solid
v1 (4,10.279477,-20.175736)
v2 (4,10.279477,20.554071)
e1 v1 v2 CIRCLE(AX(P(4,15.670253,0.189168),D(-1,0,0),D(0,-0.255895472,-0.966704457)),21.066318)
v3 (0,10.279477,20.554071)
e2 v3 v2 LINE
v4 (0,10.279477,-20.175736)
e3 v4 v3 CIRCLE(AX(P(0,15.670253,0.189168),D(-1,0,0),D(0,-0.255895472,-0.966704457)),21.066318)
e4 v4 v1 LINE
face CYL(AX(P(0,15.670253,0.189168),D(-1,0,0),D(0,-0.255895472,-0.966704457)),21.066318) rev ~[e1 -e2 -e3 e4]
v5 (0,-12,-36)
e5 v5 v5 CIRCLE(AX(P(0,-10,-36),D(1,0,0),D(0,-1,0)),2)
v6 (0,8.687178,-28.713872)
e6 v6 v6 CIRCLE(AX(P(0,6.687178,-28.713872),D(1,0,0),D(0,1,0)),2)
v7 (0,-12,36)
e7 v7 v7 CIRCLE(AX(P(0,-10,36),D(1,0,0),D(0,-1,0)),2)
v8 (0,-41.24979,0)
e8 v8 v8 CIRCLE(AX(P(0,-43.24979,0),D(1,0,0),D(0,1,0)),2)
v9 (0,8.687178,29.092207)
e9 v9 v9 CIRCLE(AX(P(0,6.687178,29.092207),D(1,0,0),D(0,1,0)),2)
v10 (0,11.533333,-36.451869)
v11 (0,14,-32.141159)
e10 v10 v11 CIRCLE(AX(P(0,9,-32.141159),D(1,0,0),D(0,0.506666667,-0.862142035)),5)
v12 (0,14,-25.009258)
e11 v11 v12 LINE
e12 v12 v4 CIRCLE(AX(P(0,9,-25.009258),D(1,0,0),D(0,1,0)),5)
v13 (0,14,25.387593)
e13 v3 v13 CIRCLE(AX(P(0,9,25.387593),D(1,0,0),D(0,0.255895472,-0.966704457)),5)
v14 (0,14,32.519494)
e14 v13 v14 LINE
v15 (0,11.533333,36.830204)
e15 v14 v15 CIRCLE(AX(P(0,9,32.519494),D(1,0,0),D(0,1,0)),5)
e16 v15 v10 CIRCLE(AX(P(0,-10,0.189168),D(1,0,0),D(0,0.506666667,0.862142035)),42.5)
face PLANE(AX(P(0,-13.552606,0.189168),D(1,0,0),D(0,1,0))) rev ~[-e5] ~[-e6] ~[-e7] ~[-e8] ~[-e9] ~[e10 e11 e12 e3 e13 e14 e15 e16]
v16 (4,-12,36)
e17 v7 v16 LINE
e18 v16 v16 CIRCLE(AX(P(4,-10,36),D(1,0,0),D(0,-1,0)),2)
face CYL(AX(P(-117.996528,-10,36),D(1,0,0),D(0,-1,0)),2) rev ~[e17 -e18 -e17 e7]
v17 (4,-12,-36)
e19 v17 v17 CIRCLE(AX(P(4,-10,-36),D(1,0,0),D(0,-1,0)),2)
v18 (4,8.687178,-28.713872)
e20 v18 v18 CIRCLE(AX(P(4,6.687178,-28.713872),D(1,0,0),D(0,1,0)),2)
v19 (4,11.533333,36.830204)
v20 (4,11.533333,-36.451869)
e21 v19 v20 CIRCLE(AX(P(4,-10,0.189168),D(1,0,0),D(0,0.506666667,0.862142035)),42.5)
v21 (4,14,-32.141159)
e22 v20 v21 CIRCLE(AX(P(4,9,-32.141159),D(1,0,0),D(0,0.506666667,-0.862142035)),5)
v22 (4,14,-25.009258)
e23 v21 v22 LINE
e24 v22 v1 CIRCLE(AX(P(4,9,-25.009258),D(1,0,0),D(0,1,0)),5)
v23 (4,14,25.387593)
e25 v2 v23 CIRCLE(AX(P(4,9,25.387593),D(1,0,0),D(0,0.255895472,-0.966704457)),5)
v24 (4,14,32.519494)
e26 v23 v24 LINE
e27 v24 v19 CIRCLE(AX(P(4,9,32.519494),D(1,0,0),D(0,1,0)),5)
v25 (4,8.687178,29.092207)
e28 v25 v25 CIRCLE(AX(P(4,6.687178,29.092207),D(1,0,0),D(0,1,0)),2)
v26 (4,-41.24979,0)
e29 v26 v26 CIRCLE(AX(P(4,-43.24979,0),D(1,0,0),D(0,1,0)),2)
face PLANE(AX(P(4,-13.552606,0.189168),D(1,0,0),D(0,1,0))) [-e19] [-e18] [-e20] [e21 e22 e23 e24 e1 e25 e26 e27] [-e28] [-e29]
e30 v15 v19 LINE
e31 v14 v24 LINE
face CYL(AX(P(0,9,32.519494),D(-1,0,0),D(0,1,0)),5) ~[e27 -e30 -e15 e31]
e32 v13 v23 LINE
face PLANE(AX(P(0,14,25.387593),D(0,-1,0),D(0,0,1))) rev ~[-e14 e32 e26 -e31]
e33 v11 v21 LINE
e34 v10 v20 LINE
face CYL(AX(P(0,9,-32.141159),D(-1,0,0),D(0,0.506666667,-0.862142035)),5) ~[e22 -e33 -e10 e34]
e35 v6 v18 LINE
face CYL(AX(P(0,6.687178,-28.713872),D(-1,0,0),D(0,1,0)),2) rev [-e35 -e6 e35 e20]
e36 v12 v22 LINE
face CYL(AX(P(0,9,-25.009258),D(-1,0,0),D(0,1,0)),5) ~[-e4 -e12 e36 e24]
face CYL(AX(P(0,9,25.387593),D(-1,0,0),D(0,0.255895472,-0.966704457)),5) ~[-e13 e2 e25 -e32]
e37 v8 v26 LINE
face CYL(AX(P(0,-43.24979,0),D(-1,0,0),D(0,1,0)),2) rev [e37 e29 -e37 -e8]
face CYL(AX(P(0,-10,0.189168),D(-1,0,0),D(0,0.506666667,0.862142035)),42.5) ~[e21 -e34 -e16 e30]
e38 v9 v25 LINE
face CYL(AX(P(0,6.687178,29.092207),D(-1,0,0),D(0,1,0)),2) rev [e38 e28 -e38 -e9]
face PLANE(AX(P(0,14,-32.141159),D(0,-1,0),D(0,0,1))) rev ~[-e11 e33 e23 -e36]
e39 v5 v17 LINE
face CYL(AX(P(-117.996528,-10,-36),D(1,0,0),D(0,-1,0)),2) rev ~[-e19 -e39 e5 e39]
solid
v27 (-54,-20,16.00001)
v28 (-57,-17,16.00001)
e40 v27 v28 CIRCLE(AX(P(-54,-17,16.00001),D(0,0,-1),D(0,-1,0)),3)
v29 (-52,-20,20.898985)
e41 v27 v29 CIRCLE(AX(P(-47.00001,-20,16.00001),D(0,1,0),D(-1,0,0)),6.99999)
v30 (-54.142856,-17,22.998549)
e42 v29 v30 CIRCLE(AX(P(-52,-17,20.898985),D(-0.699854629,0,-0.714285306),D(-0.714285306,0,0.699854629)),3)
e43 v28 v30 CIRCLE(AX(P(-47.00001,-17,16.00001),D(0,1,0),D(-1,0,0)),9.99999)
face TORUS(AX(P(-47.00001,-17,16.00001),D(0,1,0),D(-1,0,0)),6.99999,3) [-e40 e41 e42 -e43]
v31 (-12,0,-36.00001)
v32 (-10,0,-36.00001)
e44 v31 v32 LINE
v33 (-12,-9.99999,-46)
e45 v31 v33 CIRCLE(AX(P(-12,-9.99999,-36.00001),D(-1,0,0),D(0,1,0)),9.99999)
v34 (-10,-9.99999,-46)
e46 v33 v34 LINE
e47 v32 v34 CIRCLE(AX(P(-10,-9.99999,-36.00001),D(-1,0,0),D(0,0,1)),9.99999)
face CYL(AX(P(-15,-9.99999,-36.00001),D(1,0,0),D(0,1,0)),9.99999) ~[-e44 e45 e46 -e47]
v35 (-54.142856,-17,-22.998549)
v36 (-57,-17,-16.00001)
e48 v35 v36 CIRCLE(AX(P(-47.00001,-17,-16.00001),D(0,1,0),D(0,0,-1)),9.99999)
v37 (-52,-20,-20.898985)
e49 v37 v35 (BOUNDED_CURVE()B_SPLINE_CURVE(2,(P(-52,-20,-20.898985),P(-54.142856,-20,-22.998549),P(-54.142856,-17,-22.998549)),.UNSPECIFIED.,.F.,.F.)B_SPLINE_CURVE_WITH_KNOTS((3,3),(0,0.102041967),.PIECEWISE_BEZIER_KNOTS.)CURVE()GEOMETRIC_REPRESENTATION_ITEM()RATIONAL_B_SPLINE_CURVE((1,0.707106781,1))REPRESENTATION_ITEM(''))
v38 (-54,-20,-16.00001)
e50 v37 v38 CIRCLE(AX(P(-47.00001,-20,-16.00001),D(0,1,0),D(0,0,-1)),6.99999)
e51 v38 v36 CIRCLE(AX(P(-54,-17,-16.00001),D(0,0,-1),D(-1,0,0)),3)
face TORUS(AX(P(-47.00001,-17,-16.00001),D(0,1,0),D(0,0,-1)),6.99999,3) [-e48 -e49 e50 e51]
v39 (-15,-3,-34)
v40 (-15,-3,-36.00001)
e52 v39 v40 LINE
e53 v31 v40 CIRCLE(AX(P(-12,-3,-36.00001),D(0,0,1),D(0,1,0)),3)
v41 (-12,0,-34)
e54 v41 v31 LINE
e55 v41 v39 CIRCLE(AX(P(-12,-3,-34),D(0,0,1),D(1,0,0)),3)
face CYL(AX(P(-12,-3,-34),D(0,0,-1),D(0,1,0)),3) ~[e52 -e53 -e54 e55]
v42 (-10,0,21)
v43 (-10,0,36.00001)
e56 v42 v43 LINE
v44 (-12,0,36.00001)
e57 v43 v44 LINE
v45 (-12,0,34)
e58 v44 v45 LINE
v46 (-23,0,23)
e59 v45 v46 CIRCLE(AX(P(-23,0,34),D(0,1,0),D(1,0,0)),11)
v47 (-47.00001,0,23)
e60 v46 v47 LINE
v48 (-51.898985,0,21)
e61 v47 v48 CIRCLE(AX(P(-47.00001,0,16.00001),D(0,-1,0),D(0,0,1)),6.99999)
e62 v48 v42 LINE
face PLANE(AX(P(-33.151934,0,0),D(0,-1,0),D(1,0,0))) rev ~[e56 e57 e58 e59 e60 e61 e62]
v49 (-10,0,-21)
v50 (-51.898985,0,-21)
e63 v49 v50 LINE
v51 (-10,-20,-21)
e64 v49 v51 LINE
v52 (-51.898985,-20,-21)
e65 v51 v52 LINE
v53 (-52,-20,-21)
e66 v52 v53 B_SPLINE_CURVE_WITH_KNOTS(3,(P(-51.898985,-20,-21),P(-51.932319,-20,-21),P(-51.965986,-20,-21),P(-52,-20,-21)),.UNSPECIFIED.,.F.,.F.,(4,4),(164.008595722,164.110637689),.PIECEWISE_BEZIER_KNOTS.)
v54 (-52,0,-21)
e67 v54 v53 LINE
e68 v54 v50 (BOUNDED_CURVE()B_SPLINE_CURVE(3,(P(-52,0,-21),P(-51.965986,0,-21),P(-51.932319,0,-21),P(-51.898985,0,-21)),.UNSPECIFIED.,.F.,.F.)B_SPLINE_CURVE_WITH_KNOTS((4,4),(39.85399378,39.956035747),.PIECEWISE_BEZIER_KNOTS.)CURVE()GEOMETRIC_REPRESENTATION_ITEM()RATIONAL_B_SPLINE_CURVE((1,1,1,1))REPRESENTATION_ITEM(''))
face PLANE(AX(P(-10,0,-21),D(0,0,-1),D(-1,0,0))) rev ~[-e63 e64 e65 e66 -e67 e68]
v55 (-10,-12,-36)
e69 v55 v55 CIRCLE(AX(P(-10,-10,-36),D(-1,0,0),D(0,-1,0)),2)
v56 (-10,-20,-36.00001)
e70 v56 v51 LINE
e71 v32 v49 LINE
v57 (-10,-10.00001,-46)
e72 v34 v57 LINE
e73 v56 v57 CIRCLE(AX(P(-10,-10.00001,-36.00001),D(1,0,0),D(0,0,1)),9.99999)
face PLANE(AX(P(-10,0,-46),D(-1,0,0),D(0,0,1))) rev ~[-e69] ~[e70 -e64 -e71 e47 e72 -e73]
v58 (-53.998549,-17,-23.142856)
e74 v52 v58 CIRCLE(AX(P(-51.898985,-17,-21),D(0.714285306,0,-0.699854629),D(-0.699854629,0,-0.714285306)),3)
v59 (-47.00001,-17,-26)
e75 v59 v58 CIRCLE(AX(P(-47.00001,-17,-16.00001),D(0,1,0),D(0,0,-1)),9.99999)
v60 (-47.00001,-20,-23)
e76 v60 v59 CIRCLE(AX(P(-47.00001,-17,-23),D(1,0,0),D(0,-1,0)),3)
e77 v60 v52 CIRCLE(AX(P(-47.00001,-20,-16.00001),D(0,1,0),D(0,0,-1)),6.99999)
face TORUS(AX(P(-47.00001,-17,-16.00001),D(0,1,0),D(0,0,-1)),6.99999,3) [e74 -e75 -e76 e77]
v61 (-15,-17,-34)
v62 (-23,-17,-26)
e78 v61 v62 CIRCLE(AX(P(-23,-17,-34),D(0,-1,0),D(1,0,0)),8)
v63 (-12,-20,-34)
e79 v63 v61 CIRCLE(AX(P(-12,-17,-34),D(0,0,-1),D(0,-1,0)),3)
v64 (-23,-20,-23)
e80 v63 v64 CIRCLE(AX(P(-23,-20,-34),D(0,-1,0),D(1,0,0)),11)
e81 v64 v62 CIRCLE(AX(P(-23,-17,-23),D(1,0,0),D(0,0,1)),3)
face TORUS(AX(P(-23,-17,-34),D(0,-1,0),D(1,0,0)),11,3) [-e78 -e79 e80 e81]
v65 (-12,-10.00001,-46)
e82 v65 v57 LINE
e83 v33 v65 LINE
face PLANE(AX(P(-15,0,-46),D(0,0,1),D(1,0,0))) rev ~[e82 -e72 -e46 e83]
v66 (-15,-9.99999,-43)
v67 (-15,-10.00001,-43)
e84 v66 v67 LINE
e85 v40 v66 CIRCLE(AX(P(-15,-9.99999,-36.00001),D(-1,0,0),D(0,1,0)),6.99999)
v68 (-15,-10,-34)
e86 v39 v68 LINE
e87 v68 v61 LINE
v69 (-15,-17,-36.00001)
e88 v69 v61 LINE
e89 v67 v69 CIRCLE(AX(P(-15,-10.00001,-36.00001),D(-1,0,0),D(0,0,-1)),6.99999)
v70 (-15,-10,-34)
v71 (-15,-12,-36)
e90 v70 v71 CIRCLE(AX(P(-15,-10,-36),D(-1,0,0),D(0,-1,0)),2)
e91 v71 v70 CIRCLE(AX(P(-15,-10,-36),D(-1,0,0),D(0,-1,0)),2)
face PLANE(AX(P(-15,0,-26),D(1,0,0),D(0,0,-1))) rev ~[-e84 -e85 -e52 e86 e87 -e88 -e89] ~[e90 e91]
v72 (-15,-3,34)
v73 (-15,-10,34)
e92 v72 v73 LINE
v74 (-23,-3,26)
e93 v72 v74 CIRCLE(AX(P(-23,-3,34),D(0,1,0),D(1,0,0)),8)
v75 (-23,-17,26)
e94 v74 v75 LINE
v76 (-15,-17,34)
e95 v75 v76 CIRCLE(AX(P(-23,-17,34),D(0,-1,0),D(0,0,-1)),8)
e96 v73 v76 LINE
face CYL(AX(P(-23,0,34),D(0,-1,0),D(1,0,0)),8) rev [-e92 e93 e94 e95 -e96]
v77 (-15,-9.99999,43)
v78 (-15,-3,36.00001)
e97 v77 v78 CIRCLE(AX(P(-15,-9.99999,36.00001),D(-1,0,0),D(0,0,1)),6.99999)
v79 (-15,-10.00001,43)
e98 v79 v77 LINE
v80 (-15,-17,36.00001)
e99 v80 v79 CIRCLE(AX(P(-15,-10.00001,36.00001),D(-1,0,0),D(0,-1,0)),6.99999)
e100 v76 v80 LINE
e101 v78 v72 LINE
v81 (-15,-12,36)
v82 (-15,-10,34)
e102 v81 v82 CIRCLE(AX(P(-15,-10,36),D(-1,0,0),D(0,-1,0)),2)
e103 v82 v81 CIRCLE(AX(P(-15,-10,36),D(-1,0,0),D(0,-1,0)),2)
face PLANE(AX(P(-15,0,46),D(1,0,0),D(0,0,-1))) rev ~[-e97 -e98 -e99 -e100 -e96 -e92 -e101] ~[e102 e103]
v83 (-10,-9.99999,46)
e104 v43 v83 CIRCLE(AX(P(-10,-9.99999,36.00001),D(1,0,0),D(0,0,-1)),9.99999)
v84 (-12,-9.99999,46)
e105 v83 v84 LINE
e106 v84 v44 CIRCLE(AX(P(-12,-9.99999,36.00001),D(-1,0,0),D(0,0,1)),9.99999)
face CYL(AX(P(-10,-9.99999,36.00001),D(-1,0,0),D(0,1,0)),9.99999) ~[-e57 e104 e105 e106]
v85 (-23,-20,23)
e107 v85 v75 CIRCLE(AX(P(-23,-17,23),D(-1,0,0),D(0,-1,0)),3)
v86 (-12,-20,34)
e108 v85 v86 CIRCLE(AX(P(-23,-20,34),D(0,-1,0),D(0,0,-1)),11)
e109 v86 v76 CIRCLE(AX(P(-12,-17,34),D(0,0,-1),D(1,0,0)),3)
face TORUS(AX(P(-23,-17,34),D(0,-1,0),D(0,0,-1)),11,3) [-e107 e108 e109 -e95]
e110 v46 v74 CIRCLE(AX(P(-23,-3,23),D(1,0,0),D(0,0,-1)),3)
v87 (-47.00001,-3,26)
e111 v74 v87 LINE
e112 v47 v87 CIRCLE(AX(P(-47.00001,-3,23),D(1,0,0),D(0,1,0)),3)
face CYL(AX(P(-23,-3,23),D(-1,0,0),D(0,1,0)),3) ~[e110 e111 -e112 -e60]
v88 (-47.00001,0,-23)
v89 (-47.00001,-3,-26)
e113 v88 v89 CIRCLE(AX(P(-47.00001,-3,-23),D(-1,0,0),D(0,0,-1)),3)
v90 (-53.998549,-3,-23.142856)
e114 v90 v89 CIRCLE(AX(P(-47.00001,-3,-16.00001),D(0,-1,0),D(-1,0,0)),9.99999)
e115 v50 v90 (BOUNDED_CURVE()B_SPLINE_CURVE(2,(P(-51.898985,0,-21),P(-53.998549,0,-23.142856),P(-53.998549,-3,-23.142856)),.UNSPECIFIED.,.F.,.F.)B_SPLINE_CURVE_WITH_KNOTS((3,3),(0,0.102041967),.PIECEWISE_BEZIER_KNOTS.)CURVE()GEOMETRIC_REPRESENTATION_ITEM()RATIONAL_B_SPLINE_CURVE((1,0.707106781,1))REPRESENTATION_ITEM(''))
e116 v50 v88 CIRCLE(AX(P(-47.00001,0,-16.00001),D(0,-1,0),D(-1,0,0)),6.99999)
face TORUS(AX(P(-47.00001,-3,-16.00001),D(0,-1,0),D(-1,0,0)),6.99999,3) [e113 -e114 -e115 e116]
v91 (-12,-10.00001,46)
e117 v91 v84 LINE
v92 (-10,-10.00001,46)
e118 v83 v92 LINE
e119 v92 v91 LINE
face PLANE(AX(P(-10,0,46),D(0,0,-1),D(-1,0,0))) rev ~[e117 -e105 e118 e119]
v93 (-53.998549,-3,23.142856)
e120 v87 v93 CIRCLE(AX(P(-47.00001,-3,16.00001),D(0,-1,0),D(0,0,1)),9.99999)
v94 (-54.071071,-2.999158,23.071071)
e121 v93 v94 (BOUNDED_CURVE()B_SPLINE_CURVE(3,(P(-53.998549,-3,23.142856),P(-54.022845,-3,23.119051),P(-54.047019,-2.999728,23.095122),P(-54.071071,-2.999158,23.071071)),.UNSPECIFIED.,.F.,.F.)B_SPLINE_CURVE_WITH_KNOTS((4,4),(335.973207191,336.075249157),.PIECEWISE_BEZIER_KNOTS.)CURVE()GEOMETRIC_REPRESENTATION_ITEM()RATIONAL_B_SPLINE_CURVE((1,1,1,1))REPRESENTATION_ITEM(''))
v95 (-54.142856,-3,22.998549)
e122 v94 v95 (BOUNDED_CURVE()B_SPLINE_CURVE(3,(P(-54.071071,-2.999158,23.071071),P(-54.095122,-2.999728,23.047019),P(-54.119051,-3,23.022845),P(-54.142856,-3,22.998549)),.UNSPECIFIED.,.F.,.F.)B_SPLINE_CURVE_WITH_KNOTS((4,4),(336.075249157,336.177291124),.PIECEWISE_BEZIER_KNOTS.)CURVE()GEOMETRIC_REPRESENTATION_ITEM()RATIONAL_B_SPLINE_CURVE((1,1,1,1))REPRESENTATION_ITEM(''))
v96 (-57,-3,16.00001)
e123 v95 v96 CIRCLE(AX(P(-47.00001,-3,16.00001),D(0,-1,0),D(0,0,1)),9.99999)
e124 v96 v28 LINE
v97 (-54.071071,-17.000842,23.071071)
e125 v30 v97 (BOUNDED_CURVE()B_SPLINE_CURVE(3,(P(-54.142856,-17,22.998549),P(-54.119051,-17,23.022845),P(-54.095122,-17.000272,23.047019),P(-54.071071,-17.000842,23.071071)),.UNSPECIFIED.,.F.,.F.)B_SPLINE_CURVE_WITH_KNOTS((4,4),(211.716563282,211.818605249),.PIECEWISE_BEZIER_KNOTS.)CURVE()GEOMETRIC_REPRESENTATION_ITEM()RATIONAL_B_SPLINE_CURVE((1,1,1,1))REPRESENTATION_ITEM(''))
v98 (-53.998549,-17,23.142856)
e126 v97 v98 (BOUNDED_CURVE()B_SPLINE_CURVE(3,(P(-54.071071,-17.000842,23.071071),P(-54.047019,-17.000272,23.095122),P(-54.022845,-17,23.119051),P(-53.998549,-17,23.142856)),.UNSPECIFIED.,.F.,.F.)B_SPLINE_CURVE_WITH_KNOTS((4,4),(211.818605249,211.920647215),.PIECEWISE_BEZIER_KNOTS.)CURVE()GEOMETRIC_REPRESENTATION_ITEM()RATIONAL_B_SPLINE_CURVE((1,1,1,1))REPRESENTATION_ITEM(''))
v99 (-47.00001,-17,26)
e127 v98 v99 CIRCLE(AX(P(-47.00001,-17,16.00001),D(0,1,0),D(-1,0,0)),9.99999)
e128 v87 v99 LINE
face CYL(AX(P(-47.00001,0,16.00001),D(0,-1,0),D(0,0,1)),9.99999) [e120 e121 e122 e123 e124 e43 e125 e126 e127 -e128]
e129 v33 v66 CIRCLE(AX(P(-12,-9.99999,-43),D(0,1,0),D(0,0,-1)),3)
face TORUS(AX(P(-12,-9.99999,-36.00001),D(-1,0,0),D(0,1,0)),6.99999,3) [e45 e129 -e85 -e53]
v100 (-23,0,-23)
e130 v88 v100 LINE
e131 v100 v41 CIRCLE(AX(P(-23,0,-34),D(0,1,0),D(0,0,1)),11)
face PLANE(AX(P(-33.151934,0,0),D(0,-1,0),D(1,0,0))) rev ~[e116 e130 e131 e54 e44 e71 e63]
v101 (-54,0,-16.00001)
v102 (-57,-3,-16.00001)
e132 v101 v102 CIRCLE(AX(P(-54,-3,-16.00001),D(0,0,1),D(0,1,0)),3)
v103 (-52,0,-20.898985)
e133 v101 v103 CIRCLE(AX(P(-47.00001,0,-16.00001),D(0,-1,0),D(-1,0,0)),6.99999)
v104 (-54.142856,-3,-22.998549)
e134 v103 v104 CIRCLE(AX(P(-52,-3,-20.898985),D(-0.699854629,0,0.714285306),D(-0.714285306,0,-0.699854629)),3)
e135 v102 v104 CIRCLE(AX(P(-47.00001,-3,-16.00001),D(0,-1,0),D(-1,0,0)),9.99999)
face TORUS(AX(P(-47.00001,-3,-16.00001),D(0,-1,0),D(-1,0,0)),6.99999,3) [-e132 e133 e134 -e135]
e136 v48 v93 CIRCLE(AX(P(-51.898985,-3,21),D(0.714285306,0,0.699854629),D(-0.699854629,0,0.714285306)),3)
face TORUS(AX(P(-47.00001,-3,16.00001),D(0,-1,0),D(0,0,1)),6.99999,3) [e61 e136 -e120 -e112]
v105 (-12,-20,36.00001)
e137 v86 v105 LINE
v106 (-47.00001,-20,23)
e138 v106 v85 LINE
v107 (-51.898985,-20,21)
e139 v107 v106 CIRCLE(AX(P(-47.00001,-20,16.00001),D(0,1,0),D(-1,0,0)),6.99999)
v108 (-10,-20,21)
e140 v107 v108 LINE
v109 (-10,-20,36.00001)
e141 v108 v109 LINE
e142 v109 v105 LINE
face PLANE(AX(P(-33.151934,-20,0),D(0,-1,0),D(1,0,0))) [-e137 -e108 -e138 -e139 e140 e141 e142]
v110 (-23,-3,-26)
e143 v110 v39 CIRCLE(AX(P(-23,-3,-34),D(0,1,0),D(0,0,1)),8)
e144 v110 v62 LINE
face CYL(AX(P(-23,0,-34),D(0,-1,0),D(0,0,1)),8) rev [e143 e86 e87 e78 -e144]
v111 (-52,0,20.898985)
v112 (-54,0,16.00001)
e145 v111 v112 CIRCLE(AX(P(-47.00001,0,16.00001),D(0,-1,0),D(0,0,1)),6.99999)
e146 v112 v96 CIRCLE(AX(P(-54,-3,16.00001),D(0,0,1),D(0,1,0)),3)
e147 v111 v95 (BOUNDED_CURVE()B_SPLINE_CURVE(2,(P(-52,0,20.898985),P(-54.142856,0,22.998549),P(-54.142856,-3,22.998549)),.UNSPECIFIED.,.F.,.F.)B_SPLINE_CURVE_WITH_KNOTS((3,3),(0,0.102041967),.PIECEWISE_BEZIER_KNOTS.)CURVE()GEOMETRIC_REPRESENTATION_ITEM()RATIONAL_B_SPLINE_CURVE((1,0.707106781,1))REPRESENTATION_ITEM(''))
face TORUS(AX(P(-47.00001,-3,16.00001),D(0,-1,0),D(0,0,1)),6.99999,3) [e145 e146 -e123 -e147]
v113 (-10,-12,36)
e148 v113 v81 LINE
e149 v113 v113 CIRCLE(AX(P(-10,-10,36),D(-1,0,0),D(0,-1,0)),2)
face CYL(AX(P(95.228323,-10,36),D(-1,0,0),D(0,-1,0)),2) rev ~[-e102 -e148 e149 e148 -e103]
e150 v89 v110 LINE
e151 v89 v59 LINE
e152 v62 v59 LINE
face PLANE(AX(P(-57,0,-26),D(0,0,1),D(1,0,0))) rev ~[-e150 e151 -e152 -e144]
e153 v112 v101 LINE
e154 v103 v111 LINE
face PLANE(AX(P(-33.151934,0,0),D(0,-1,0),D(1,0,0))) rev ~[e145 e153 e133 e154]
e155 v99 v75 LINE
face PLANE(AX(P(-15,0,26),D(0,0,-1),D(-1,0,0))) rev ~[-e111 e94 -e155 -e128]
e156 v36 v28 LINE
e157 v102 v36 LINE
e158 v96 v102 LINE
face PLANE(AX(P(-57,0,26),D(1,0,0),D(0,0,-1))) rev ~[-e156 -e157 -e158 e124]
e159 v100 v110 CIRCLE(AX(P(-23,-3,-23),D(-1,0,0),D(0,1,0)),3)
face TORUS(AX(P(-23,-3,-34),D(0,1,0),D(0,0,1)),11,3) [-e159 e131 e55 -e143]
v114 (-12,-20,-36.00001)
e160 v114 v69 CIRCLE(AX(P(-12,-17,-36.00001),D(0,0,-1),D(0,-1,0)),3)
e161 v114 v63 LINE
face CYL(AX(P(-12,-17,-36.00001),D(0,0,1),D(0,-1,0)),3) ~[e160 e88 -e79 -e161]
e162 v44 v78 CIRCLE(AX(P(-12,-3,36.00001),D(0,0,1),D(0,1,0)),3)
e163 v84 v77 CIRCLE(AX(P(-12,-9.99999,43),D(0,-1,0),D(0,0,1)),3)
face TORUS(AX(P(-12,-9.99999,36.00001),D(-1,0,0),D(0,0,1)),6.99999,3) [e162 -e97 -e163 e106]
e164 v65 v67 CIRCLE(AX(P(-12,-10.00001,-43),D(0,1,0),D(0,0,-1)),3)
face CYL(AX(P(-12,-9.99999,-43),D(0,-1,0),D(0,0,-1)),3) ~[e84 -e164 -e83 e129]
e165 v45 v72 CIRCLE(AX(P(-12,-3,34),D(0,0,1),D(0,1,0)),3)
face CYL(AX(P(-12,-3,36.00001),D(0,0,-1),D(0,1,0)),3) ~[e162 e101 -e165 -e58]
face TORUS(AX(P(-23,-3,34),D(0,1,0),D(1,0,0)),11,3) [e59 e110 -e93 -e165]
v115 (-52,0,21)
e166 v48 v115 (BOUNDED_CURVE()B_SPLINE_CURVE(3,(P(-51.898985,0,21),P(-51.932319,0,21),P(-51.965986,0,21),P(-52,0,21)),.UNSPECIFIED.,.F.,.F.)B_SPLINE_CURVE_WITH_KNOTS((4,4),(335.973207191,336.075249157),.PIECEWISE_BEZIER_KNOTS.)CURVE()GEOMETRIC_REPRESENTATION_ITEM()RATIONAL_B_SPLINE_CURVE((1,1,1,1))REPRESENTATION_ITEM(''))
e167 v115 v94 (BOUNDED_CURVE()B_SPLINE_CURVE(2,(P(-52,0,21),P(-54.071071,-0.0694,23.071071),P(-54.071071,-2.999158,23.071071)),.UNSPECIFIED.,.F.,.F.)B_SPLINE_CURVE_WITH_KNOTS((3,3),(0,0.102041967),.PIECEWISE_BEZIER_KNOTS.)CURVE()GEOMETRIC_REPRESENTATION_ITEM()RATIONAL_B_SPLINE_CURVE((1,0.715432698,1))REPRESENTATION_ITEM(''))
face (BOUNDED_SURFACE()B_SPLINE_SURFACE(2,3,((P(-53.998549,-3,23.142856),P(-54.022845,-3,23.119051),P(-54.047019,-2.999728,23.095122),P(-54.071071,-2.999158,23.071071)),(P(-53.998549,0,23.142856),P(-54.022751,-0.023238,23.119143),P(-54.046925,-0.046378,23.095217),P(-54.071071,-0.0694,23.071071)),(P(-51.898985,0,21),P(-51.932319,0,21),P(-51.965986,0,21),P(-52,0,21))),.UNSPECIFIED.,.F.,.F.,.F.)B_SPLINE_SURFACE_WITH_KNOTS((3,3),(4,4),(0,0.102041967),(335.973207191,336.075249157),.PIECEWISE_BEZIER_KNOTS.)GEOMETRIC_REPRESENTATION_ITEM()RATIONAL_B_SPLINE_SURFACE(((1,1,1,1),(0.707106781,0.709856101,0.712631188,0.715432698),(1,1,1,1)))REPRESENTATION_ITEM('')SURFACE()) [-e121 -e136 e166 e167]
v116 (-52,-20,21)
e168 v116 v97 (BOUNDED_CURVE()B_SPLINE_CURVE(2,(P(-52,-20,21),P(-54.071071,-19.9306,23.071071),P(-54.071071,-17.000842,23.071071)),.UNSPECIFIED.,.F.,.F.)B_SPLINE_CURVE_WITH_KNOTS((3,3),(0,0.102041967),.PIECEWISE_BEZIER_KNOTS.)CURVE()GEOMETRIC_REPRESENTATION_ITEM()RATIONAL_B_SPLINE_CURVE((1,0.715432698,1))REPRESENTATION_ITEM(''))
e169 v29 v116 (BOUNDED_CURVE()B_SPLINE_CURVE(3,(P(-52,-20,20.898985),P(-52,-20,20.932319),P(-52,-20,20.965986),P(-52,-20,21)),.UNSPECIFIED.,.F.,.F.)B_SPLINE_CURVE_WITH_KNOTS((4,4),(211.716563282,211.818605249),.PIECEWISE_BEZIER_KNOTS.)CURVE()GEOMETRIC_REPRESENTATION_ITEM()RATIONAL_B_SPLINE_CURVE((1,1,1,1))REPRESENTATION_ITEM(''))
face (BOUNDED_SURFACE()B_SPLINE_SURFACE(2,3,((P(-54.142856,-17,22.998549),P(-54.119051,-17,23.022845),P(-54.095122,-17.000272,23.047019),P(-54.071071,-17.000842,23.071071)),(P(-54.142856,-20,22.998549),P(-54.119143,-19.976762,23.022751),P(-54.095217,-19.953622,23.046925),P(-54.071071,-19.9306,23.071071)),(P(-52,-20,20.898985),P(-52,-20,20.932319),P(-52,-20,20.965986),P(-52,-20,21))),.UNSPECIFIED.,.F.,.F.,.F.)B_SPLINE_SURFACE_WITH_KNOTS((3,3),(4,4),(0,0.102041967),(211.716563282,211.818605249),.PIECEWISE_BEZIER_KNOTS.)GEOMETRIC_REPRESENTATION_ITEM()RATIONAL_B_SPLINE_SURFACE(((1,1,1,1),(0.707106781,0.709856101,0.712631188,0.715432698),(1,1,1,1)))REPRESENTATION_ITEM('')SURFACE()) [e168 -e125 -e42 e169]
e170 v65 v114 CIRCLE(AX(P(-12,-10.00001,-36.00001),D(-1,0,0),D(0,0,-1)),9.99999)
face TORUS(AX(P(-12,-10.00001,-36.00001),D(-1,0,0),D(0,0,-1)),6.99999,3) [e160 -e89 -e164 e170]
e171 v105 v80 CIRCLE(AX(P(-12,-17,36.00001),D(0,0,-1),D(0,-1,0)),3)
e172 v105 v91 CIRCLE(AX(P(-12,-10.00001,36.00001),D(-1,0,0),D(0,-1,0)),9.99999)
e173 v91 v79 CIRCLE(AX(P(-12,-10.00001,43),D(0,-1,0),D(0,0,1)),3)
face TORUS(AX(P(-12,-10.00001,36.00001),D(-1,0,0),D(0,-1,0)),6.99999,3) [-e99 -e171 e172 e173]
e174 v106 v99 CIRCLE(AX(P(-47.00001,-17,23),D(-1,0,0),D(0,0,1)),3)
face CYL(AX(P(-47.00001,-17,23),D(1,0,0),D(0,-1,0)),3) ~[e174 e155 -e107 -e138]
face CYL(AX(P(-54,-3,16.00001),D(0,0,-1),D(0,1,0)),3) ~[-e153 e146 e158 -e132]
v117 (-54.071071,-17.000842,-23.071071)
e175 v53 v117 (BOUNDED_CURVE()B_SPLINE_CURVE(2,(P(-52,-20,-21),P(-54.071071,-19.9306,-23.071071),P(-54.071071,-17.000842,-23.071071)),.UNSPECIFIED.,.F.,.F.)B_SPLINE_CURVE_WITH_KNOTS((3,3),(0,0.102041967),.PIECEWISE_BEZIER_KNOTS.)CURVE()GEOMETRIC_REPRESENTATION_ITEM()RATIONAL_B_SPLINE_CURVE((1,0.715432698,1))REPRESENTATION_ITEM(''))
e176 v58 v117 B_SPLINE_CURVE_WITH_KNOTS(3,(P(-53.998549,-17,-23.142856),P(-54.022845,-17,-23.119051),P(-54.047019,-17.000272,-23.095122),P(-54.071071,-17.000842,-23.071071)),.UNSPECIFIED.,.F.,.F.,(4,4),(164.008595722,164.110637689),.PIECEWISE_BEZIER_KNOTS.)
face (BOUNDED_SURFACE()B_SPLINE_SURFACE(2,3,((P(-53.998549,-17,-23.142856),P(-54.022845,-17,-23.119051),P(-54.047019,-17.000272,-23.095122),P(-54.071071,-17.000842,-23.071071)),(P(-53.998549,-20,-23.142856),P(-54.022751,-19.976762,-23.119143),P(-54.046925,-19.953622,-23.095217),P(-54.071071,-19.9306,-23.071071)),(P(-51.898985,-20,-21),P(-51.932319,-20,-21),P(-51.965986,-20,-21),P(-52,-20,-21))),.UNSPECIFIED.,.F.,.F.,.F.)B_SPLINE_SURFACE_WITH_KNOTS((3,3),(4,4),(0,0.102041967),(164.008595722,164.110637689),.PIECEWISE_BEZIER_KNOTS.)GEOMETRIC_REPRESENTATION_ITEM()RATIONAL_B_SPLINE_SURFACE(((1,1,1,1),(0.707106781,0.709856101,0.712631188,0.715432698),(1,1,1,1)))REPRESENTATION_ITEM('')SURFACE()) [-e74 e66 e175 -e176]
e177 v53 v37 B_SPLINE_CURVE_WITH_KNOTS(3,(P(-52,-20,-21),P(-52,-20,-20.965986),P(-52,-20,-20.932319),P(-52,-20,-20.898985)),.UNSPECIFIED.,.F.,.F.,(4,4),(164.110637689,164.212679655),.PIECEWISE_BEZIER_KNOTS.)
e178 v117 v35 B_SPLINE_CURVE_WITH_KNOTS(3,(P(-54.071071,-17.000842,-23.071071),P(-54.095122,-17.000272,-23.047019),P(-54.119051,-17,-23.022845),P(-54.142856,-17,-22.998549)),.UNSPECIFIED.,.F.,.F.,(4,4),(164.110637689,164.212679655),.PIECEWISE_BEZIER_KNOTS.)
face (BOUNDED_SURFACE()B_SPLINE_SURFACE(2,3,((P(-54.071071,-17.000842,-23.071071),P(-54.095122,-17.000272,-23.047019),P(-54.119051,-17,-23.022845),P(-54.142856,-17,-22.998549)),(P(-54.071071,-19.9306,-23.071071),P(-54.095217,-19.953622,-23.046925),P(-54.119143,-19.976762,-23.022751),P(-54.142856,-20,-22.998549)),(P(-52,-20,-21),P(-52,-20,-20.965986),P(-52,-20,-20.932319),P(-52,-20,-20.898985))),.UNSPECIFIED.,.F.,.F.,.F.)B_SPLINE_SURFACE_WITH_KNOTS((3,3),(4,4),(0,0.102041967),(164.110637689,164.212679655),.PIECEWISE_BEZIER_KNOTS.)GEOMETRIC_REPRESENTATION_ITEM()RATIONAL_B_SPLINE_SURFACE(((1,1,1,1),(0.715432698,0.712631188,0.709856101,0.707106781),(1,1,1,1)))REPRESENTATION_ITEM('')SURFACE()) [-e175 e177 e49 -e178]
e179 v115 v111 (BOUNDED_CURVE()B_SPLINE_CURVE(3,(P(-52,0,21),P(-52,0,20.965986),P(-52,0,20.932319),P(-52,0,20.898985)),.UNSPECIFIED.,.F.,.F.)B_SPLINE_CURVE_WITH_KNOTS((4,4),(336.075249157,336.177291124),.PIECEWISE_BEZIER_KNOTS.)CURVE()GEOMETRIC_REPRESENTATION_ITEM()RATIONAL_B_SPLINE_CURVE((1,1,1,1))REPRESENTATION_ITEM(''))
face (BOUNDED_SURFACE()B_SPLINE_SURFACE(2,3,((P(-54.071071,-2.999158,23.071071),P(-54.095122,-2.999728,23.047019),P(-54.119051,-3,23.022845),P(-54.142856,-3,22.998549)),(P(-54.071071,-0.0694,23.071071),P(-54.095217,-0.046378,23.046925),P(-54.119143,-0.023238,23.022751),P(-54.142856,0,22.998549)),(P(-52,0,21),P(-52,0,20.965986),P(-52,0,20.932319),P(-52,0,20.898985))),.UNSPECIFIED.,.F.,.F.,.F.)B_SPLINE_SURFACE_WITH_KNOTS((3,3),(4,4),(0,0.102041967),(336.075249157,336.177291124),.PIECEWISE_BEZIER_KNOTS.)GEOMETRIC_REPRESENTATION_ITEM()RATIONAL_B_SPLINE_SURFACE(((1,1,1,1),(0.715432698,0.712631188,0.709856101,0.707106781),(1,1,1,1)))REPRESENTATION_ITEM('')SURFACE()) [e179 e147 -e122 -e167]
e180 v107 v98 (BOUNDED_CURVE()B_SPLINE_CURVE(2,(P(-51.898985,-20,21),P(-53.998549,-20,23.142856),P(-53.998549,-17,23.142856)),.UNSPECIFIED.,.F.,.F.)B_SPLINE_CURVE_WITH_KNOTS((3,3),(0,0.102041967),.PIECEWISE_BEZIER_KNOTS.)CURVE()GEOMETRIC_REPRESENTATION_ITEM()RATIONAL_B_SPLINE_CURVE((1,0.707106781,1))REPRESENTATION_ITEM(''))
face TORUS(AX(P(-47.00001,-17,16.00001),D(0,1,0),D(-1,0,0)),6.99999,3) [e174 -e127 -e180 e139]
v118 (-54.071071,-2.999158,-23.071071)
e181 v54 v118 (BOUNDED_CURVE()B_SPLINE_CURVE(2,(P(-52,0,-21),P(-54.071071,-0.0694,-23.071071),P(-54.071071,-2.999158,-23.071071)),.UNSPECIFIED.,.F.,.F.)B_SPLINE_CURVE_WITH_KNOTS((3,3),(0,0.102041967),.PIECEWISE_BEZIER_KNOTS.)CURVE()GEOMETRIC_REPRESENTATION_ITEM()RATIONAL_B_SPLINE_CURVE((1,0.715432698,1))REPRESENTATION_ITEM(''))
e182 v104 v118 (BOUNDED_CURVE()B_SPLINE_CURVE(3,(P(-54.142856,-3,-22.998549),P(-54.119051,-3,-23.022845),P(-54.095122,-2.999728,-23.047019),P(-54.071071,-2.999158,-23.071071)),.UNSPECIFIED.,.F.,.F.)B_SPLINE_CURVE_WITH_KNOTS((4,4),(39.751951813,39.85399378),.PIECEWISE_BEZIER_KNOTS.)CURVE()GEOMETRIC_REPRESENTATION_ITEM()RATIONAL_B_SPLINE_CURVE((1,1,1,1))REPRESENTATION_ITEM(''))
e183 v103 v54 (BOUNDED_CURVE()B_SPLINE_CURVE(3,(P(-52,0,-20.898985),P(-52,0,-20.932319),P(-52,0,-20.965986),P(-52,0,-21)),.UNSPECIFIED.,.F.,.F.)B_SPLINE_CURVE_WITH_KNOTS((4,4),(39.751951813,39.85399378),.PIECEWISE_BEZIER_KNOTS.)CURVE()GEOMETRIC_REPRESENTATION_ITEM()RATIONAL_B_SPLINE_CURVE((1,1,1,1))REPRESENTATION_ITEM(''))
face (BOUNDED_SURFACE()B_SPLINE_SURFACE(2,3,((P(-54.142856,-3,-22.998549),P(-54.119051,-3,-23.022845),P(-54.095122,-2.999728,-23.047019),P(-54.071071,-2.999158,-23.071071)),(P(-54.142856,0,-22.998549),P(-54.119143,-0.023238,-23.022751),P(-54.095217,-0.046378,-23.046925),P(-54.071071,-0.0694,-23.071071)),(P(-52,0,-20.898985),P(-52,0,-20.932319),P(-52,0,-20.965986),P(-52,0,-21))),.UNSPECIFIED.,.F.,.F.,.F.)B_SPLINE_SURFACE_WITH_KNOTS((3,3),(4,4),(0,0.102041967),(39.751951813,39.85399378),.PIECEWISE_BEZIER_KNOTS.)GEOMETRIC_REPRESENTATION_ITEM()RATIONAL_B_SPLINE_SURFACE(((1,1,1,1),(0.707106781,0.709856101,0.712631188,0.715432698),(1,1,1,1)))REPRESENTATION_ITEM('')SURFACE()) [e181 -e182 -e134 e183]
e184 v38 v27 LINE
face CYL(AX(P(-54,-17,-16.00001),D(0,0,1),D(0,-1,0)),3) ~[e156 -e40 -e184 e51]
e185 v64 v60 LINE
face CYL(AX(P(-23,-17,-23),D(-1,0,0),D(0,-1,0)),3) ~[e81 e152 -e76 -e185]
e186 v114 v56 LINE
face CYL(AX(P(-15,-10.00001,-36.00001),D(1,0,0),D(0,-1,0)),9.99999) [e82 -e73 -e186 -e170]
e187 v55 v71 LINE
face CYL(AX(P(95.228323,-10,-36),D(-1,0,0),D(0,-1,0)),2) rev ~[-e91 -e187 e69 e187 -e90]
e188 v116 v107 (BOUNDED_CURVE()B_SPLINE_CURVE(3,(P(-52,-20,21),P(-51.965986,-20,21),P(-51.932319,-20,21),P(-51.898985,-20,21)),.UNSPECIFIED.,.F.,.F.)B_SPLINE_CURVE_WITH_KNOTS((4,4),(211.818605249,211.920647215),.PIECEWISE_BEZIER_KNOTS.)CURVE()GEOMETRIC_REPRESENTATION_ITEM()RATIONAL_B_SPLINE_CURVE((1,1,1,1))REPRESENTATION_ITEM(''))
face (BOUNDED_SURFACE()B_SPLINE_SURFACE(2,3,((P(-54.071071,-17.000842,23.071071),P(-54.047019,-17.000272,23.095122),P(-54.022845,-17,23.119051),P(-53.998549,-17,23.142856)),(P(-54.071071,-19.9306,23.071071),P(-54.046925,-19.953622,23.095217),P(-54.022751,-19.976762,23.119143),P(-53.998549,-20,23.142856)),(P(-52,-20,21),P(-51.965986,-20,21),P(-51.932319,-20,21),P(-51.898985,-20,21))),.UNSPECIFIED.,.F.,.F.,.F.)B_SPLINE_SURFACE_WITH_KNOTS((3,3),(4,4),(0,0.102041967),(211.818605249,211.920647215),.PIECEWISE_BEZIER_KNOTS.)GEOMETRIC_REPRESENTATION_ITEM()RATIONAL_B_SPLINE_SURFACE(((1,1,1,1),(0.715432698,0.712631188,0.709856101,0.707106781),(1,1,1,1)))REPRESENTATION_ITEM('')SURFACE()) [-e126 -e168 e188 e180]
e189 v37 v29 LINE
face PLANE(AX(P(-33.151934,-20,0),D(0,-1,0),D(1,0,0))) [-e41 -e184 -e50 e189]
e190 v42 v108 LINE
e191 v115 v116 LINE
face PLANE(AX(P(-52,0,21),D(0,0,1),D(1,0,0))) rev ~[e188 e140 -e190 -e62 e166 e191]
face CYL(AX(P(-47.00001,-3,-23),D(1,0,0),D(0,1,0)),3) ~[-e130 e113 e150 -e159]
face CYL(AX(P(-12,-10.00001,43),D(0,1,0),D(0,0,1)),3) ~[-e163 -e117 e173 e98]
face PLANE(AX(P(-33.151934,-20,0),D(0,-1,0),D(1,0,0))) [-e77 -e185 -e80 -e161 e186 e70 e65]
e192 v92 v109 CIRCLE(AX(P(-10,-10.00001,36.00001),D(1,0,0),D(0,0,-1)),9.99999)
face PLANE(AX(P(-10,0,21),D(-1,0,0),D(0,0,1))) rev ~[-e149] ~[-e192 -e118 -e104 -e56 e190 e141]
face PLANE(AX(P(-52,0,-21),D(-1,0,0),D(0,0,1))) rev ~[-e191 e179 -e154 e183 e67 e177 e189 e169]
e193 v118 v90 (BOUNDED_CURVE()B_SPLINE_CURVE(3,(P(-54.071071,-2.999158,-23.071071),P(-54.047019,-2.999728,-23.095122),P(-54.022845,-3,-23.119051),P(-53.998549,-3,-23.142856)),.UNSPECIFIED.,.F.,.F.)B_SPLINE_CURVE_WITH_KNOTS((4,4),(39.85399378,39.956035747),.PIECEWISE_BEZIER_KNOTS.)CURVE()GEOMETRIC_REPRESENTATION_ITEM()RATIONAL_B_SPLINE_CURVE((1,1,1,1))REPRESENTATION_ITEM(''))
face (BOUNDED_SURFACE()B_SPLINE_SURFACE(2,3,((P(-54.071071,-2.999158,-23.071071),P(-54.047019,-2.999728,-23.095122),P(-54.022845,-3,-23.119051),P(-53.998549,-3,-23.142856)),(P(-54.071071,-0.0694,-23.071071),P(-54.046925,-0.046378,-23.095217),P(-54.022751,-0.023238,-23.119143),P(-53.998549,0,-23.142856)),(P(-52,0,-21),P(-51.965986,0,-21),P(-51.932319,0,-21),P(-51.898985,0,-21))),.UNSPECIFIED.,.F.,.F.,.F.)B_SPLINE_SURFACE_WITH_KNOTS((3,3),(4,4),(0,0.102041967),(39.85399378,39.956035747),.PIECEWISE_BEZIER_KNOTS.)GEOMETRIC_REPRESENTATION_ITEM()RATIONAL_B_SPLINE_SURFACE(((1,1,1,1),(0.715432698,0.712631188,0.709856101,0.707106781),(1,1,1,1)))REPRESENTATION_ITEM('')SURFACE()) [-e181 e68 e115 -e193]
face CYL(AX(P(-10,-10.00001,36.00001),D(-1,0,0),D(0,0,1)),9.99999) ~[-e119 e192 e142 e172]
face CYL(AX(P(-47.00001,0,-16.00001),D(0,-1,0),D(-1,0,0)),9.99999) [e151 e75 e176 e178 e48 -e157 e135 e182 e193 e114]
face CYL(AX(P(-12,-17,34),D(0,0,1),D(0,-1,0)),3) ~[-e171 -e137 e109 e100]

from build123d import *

# Parameters (mm, degrees)
F1_DEPTH    = 20
F2_R        = 8
F3_R        = 9.99999
F4_R        = 3
F7_R        = 2
F8_DEPTH    = 4
F9_D        = 4
F9_ON_F5_D  = 4
F10_D       = 4
F10_ON_F5_D = 4


# Not quite as in the source:
# - a fillet or chamfer is up to 0.001 mm smaller than in the source, because OpenCascade refuses the exact size


with BuildPart() as f1:
    # F0 (on Front) → F1 (new body)
    with BuildSketch(Plane.XZ):
        Polygon((-52, 21), (-10, 21), (-10, 46), (-15, 46), (-15, 26), (-57, 26), (-57, -26), (-15, -26), (-15, -46), (-10, -46), (-10, -21), (-52, -21), align=None)
    extrude(amount=F1_DEPTH)

    # F2
    f2_edges = [f1.edges().sort_by_distance(p)[0] for p in [
        (-15, -10, -26),
        (-15, -10, 26),
    ]]
    fillet(f2_edges, radius=F2_R)

    # F3 (radius 10 in the source; OpenCascade refuses exactly that, so slightly less here)
    f3_edges = [f1.edges().sort_by_distance(p)[0] for p in [
        (-12.5, 0, 46),
        (-12.5, -20, 46),
        (-12.5, 0, -46),
        (-12.5, -20, -46),
        (-57, -10, -26),
        (-57, -10, 26),
    ]]
    fillet(f3_edges, radius=F3_R)

    # F4
    f4_edges = [f1.edges().sort_by_distance(p)[0] for p in [
        (-57, 0, 0),
    ]]
    fillet(f4_edges, radius=F4_R)

    # F9 (through all)
    with Locations(Plane.YZ.offset(-10)):
        with Locations((-10, -36)):
            Hole(F9_D / 2)

    # F9 on F5 (through all)
    with Locations(Plane.YZ.offset(-10)):
        with Locations((-10, 36)):
            Hole(F9_ON_F5_D / 2)


with BuildPart() as f8:
    # F7 (on Right) → F8 (new body)
    with BuildSketch(Plane.YZ):
        with BuildLine():
            ThreePointArc((14, 32.5194938452), (13.3397388554, 35.0027712494), (11.5333333333, 36.8302040212))
            ThreePointArc((11.5333333333, 36.8302040212), (-52.5, 0.1891675245), (11.5333333333, -36.4518689722))
            ThreePointArc((11.5333333333, -36.4518689722), (13.3397388554, -34.6244362004), (14, -32.1411587962))
            Line((14, -32.1411587962), (14, -25.009258036))
            ThreePointArc((14, -25.009258036), (12.9621576699, -21.9594536818), (10.2794773604, -20.1757357505))
            ThreePointArc((10.2794773604, -20.1757357505), (-5.3960650728, 0.1891675245), (10.2794773604, 20.5540707995))
            ThreePointArc((10.2794773604, 20.5540707995), (12.9621576699, 22.3377887308), (14, 25.387593085))
            Line((14, 25.387593085), (14, 32.5194938452))
        make_face()
        with Locations((-43.2497895028, 0)):
            Circle(F7_R, mode=Mode.SUBTRACT)
        with Locations((6.6871778265, -28.7138723059)):
            Circle(F7_R, mode=Mode.SUBTRACT)
        with Locations((6.6871778265, 29.0922073549)):
            Circle(F7_R, mode=Mode.SUBTRACT)
    extrude(amount=F8_DEPTH)

    # F10 (through all)
    with Locations(Plane(origin=(-10, 0, 0), x_dir=(0, 1, 0), z_dir=(-1, 0, 0))):
        with Locations((-10, 36)):
            Hole(F10_D / 2)

    # F10 on F5 (through all)
    with Locations(Plane(origin=(-10, 0, 0), x_dir=(0, 1, 0), z_dir=(-1, 0, 0))):
        with Locations((-10, -36)):
            Hole(F10_ON_F5_D / 2)


solid = Compound([f1.part, f8.part])
